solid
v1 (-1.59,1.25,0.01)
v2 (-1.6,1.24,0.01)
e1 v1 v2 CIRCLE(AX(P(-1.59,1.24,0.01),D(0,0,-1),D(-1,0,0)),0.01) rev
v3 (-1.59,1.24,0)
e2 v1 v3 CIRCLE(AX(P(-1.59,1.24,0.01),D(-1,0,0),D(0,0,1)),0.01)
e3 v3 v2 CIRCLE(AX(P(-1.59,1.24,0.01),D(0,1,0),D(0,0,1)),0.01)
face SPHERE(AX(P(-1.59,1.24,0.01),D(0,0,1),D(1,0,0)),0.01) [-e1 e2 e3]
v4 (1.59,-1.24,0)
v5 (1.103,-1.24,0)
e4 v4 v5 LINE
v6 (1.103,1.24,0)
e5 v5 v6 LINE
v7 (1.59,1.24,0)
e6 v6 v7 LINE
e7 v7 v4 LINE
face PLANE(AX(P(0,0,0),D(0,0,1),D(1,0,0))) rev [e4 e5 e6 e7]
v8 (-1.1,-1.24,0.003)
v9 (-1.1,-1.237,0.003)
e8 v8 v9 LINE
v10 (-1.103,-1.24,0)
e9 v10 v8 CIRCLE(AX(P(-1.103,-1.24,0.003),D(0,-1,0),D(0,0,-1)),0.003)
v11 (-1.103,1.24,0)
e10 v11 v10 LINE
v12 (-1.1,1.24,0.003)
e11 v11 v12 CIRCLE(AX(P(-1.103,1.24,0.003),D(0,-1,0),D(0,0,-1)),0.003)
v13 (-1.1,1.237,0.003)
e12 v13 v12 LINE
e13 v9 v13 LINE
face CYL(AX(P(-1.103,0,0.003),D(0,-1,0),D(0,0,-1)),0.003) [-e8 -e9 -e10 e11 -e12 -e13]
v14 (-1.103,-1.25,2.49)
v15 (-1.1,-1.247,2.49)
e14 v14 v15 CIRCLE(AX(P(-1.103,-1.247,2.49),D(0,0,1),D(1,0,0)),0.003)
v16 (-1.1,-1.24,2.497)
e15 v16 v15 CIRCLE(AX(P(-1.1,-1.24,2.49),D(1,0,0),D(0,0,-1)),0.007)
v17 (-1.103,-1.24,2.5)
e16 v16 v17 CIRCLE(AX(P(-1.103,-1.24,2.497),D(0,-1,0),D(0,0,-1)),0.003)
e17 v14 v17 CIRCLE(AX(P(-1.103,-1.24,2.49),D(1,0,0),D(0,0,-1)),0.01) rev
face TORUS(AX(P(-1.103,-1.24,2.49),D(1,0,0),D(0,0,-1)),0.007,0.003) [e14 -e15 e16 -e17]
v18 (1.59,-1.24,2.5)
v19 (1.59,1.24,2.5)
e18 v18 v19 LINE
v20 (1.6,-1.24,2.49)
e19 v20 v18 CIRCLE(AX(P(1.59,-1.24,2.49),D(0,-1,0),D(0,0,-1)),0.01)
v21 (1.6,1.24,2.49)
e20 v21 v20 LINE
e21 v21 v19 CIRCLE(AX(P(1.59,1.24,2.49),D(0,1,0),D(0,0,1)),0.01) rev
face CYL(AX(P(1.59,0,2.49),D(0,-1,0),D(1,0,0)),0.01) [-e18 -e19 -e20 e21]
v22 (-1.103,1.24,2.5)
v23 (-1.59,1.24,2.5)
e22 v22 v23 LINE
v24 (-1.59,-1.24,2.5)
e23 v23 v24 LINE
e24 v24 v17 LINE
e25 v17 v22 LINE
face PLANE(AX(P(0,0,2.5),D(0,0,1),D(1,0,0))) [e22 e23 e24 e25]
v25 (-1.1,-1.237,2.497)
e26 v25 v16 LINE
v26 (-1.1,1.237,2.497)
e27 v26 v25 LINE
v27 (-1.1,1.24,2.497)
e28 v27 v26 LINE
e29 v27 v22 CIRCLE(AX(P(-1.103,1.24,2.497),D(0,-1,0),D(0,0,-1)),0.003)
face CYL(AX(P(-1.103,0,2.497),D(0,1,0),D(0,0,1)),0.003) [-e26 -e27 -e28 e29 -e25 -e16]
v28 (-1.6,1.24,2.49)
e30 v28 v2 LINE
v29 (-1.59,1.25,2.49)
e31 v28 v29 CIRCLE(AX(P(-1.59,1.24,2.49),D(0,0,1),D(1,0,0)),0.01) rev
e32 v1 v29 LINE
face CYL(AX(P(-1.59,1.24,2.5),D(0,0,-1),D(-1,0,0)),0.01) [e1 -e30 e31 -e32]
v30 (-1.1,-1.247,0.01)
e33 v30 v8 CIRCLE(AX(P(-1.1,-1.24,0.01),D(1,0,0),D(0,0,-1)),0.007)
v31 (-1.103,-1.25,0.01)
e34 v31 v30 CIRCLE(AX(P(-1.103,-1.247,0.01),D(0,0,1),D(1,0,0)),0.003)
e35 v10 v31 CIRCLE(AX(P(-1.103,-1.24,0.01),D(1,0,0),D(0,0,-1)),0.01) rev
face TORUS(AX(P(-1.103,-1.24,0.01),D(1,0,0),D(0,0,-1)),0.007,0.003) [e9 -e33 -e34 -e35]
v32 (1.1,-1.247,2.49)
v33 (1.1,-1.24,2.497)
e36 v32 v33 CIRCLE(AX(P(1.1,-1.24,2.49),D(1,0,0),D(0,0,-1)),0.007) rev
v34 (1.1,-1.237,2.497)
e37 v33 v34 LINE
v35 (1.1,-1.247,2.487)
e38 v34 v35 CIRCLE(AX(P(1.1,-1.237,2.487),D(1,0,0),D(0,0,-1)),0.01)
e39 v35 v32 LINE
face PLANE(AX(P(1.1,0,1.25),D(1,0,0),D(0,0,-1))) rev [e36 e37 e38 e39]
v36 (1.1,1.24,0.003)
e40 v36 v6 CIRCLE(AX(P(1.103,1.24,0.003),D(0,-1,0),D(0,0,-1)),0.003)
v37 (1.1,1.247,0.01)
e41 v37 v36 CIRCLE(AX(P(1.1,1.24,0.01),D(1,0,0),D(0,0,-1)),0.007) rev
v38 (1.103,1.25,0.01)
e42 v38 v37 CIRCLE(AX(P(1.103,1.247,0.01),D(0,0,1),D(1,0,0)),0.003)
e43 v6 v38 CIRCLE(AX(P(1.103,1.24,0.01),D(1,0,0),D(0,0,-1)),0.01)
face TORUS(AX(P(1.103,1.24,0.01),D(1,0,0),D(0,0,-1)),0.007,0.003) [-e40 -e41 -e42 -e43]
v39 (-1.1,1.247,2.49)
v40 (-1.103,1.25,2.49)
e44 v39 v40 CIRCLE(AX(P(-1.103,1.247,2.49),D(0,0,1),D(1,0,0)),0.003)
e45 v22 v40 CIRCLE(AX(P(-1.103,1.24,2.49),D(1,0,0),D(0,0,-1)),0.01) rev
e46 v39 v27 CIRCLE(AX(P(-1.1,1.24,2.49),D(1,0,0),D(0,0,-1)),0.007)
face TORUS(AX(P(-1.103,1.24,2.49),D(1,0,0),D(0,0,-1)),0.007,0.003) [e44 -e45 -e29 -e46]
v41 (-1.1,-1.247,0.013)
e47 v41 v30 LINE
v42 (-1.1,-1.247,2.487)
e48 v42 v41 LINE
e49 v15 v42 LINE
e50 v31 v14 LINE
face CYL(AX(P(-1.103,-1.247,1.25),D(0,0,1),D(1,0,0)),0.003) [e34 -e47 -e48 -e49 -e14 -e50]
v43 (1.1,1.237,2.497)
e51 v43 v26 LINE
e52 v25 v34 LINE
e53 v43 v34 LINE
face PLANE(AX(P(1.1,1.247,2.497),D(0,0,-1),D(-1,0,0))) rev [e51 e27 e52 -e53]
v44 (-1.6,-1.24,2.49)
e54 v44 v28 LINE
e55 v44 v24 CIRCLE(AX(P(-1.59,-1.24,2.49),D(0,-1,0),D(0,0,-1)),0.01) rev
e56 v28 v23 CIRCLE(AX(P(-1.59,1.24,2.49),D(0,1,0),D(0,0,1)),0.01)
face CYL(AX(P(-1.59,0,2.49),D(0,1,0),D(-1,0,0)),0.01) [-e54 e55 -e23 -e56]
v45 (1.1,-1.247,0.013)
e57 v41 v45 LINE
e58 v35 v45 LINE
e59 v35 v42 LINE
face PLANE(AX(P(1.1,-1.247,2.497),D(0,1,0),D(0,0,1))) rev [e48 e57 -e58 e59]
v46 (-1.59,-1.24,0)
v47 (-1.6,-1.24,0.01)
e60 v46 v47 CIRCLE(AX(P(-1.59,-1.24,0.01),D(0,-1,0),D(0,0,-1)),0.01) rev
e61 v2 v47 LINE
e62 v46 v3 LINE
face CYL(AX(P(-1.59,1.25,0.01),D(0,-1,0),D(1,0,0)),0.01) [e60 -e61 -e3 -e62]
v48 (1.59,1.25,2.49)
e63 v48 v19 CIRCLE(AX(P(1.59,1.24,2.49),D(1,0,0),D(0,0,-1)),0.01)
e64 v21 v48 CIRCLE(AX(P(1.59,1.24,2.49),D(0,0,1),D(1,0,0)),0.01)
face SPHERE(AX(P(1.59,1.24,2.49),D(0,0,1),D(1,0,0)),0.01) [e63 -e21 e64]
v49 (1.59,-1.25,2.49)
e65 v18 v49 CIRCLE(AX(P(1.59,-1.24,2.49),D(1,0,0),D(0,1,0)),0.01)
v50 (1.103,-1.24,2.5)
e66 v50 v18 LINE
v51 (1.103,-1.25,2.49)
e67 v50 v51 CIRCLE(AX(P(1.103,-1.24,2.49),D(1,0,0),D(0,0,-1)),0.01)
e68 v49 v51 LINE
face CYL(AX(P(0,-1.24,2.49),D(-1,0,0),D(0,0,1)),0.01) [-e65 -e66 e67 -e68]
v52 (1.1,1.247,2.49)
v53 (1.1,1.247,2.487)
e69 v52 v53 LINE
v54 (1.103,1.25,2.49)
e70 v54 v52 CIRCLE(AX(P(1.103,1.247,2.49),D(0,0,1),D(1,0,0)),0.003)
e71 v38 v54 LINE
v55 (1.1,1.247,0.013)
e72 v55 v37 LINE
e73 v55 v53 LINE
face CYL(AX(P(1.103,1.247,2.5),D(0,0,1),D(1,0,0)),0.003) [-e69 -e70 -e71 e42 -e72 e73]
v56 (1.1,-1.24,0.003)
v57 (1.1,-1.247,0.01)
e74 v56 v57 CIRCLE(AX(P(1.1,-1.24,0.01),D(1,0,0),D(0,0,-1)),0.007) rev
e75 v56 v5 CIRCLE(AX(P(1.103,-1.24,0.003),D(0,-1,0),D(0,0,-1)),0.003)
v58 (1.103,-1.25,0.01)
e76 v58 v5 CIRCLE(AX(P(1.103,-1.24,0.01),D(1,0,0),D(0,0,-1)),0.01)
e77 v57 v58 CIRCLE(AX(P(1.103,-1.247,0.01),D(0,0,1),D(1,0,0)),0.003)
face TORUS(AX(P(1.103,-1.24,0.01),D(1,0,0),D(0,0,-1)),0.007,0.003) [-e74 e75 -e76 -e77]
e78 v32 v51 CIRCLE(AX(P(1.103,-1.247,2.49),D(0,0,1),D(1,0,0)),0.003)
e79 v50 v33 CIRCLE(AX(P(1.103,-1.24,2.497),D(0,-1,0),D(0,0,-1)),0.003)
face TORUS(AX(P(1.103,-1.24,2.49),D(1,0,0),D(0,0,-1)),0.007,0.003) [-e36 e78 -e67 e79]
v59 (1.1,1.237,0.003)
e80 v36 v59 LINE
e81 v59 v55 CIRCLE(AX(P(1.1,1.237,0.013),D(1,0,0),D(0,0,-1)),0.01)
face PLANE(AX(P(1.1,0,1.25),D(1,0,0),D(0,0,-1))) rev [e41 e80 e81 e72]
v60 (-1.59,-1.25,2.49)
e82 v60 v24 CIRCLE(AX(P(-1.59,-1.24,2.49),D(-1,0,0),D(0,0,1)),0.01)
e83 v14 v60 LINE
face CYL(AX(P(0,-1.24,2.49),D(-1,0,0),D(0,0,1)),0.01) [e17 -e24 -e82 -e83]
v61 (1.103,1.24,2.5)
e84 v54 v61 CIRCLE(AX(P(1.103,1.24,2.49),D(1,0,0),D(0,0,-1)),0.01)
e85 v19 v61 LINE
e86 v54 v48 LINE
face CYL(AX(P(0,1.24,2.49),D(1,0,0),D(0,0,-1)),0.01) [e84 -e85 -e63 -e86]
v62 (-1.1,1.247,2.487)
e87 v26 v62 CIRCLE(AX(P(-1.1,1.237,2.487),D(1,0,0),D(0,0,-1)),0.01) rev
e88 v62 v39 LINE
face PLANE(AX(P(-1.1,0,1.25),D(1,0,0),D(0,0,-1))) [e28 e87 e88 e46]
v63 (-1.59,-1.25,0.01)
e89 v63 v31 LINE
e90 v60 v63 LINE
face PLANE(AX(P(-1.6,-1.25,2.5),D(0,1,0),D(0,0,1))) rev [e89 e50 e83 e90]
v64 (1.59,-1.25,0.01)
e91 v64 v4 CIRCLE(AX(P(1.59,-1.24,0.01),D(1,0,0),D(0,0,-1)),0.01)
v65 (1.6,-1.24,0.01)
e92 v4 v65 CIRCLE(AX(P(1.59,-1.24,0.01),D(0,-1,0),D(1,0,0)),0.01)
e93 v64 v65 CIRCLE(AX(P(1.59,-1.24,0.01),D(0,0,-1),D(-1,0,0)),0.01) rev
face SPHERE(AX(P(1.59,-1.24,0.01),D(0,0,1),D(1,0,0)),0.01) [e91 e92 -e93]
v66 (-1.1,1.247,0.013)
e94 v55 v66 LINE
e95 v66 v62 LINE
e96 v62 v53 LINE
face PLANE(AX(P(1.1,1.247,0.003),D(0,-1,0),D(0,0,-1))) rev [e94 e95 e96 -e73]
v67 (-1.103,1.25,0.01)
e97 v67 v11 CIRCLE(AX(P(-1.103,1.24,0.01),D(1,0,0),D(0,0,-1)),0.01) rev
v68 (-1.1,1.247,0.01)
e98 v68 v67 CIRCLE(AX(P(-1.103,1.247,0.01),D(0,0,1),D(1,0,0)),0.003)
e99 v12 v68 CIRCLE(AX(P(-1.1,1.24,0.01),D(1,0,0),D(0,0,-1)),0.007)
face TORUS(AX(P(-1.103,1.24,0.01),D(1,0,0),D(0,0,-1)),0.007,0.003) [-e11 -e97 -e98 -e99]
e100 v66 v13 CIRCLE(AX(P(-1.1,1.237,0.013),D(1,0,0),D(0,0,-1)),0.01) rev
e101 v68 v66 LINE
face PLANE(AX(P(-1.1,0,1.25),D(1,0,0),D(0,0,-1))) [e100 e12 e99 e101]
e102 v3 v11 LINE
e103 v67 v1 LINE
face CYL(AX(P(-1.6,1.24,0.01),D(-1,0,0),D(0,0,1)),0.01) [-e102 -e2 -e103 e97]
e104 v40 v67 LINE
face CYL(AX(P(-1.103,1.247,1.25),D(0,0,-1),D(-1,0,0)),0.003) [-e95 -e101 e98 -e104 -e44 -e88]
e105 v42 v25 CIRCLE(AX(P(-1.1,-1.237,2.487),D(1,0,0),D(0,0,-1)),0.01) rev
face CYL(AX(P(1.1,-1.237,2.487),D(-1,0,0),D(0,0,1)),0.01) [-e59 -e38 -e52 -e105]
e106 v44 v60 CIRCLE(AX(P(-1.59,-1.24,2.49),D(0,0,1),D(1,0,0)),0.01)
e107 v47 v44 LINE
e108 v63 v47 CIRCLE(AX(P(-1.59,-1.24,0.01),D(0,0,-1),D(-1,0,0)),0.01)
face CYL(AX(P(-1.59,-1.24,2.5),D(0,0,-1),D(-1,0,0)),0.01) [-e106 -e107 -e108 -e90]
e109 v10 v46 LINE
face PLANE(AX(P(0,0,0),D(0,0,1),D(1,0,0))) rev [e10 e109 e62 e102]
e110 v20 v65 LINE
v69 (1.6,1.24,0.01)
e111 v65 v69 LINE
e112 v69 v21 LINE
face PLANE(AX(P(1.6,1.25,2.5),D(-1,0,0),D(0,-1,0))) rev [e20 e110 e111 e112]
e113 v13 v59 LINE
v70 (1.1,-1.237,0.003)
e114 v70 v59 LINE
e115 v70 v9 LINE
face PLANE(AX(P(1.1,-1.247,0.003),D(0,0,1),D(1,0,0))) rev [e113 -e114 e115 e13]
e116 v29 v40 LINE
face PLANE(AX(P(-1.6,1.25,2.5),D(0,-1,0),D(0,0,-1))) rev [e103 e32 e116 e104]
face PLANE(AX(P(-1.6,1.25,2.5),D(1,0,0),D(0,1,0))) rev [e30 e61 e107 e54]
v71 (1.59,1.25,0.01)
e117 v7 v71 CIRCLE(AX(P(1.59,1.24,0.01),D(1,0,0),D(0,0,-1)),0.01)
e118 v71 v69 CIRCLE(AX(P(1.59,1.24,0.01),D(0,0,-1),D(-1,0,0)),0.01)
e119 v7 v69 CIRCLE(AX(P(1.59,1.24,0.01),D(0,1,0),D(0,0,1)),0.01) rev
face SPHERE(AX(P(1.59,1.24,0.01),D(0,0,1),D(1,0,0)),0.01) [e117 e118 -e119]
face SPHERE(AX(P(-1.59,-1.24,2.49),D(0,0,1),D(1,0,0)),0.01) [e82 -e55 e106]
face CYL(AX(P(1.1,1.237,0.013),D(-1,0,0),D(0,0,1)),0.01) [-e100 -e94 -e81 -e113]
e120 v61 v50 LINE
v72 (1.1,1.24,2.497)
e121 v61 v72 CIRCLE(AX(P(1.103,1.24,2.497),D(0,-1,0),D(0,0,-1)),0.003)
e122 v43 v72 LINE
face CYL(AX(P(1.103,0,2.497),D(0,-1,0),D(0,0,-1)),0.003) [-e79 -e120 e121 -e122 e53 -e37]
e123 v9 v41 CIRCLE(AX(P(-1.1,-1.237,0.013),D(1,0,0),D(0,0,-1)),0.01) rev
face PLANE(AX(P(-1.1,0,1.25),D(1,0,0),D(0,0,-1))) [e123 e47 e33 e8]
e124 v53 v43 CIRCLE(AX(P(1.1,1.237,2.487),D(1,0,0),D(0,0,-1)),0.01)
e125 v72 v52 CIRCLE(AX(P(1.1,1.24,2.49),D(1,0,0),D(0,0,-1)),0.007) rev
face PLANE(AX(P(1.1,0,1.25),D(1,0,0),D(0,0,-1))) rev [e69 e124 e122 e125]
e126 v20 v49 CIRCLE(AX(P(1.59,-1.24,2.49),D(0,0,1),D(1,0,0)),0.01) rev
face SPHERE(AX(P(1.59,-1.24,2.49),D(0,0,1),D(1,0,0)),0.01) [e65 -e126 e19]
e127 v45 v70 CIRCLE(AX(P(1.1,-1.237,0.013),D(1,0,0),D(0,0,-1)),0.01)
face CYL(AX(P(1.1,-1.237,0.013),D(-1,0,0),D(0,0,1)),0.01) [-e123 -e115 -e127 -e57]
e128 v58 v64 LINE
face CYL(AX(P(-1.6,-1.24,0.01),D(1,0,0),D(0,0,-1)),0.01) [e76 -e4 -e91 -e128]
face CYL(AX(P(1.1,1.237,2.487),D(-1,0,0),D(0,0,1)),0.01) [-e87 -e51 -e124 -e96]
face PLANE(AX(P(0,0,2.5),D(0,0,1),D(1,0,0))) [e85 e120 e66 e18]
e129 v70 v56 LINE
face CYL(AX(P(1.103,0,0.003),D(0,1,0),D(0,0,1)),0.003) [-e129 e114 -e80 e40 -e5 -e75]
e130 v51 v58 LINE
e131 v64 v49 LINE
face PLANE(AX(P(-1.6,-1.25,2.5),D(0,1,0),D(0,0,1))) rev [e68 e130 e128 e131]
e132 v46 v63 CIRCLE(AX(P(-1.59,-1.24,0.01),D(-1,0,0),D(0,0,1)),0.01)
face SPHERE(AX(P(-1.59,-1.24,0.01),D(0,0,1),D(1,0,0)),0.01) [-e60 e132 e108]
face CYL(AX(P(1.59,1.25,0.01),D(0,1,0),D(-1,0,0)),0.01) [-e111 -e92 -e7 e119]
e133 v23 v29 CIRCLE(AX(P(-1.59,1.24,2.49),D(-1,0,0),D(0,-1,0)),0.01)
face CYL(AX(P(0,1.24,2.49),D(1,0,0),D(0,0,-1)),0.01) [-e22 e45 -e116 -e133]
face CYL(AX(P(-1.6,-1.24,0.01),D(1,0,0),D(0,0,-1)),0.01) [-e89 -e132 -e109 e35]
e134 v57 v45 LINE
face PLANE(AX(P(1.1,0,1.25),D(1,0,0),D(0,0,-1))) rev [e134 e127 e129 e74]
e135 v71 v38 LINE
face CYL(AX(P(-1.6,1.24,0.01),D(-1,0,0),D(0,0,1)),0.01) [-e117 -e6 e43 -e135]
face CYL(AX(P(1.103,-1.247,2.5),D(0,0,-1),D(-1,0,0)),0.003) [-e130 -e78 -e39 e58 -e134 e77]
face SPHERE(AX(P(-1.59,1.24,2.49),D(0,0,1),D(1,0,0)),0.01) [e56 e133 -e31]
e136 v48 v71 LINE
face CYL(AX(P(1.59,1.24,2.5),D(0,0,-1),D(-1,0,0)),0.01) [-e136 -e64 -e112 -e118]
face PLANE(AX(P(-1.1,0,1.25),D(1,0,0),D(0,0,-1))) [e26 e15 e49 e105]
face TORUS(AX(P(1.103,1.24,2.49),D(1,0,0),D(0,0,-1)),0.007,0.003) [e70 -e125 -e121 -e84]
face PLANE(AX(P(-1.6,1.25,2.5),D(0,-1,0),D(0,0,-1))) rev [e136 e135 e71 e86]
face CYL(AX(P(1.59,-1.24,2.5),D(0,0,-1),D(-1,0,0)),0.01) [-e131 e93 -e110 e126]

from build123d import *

# Parameters (mm, degrees)
SKETCH1_W                           = 3.2
SKETCH1_H                           = 2.5
ALL_BODY_DEPTH                      = 2.5
CUT_OUT_THE_BODY_FOR_PIN_DEPTH      = 1.1
CUT_OUT_THE_BODY_FOR_PIN_DEPTH_BACK = 1.1
SKETCH2_OUTSIDE_W                   = 5.454
SKETCH2_OUTSIDE_H                   = 5.454
SKETCH2_OUTSIDE_W_2                 = 2.494
SKETCH2_OUTSIDE_H_2                 = 2.494
BODY_FILLET_R                       = 0.01
PIN_FILLET_A_R                      = 0.01
PIN_FILLET_B_R                      = 0.003


with BuildPart() as part:
    # Sketch1 → All body (new body)
    with BuildSketch(Plane.XY):
        Rectangle(SKETCH1_W, SKETCH1_H)
    extrude(amount=ALL_BODY_DEPTH)

    # Sketch2 outside → Cut out the body for pin (cut, two sides: drawn at the far end of the back side and taken through both)
    with BuildSketch(Plane(origin=(0, 0, 0), x_dir=(0, 0, -1), z_dir=(1, 0, 0)).offset(-CUT_OUT_THE_BODY_FOR_PIN_DEPTH_BACK)):
        with Locations((-1.25, 0)):
            Rectangle(SKETCH2_OUTSIDE_W, SKETCH2_OUTSIDE_H)
        with Locations((-1.25, 0)):
            Rectangle(SKETCH2_OUTSIDE_W_2, SKETCH2_OUTSIDE_H_2, mode=Mode.SUBTRACT)
    extrude(amount=CUT_OUT_THE_BODY_FOR_PIN_DEPTH + CUT_OUT_THE_BODY_FOR_PIN_DEPTH_BACK, mode=Mode.SUBTRACT)

    # Body fillet
    body_fillet_edges = [part.edges().sort_by_distance(p)[0] for p in [
        (0, 1.247, 0.003),
        (0, 1.247, 2.497),
        (0, -1.247, 2.497),
        (0, -1.247, 0.003),
    ]]
    fillet(body_fillet_edges, radius=BODY_FILLET_R)

    # Pin fillet a
    pin_fillet_a_edges = [part.edges().sort_by_distance(p)[0] for p in [
        (1.6, 0, 2.5),
        (-1.35, 1.25, 0),
        (1.35, -1.25, 0),
        (1.35, -1.25, 2.5),
        (-1.35, 1.25, 2.5),
        (1.35, 1.25, 2.5),
        (-1.6, 0, 2.5),
        (1.35, 1.25, 0),
        (1.6, 0, 0),
        (-1.35, -1.25, 0),
        (-1.6, 0, 0),
        (-1.6, 1.25, 1.25),
        (1.6, 1.25, 1.25),
        (1.6, -1.25, 1.25),
        (-1.6, -1.25, 1.25),
        (-1.35, -1.25, 2.5),
    ]]
    fillet(pin_fillet_a_edges, radius=PIN_FILLET_A_R)

    # Pin fillet b
    pin_fillet_b_edges = [part.edges().sort_by_distance(p)[0] for p in [
        (1.1, -1.25, 1.25),
        (1.1, 0, 2.5),
        (1.1, 1.25, 1.25),
        (1.1, 0, 0),
        (-1.1, 1.25, 1.25),
        (-1.1, 0, 2.5),
        (-1.1, -1.25, 1.25),
        (-1.1, 0, 0),
        (1.1, 1.247071068, 0.002928932),
        (1.1, -1.247071068, 0.002928932),
        (1.1, -1.247071068, 2.497071068),
        (1.1, 1.247071068, 2.497071068),
        (-1.1, -1.247071068, 2.497071068),
        (-1.1, 1.247071068, 2.497071068),
        (-1.1, -1.247071068, 0.002928932),
        (-1.1, 1.247071068, 0.002928932),
    ]]
    fillet(pin_fillet_b_edges, radius=PIN_FILLET_B_R - 0.0001)  # a hair under: the kernel refuses the full size


solid = part.part
